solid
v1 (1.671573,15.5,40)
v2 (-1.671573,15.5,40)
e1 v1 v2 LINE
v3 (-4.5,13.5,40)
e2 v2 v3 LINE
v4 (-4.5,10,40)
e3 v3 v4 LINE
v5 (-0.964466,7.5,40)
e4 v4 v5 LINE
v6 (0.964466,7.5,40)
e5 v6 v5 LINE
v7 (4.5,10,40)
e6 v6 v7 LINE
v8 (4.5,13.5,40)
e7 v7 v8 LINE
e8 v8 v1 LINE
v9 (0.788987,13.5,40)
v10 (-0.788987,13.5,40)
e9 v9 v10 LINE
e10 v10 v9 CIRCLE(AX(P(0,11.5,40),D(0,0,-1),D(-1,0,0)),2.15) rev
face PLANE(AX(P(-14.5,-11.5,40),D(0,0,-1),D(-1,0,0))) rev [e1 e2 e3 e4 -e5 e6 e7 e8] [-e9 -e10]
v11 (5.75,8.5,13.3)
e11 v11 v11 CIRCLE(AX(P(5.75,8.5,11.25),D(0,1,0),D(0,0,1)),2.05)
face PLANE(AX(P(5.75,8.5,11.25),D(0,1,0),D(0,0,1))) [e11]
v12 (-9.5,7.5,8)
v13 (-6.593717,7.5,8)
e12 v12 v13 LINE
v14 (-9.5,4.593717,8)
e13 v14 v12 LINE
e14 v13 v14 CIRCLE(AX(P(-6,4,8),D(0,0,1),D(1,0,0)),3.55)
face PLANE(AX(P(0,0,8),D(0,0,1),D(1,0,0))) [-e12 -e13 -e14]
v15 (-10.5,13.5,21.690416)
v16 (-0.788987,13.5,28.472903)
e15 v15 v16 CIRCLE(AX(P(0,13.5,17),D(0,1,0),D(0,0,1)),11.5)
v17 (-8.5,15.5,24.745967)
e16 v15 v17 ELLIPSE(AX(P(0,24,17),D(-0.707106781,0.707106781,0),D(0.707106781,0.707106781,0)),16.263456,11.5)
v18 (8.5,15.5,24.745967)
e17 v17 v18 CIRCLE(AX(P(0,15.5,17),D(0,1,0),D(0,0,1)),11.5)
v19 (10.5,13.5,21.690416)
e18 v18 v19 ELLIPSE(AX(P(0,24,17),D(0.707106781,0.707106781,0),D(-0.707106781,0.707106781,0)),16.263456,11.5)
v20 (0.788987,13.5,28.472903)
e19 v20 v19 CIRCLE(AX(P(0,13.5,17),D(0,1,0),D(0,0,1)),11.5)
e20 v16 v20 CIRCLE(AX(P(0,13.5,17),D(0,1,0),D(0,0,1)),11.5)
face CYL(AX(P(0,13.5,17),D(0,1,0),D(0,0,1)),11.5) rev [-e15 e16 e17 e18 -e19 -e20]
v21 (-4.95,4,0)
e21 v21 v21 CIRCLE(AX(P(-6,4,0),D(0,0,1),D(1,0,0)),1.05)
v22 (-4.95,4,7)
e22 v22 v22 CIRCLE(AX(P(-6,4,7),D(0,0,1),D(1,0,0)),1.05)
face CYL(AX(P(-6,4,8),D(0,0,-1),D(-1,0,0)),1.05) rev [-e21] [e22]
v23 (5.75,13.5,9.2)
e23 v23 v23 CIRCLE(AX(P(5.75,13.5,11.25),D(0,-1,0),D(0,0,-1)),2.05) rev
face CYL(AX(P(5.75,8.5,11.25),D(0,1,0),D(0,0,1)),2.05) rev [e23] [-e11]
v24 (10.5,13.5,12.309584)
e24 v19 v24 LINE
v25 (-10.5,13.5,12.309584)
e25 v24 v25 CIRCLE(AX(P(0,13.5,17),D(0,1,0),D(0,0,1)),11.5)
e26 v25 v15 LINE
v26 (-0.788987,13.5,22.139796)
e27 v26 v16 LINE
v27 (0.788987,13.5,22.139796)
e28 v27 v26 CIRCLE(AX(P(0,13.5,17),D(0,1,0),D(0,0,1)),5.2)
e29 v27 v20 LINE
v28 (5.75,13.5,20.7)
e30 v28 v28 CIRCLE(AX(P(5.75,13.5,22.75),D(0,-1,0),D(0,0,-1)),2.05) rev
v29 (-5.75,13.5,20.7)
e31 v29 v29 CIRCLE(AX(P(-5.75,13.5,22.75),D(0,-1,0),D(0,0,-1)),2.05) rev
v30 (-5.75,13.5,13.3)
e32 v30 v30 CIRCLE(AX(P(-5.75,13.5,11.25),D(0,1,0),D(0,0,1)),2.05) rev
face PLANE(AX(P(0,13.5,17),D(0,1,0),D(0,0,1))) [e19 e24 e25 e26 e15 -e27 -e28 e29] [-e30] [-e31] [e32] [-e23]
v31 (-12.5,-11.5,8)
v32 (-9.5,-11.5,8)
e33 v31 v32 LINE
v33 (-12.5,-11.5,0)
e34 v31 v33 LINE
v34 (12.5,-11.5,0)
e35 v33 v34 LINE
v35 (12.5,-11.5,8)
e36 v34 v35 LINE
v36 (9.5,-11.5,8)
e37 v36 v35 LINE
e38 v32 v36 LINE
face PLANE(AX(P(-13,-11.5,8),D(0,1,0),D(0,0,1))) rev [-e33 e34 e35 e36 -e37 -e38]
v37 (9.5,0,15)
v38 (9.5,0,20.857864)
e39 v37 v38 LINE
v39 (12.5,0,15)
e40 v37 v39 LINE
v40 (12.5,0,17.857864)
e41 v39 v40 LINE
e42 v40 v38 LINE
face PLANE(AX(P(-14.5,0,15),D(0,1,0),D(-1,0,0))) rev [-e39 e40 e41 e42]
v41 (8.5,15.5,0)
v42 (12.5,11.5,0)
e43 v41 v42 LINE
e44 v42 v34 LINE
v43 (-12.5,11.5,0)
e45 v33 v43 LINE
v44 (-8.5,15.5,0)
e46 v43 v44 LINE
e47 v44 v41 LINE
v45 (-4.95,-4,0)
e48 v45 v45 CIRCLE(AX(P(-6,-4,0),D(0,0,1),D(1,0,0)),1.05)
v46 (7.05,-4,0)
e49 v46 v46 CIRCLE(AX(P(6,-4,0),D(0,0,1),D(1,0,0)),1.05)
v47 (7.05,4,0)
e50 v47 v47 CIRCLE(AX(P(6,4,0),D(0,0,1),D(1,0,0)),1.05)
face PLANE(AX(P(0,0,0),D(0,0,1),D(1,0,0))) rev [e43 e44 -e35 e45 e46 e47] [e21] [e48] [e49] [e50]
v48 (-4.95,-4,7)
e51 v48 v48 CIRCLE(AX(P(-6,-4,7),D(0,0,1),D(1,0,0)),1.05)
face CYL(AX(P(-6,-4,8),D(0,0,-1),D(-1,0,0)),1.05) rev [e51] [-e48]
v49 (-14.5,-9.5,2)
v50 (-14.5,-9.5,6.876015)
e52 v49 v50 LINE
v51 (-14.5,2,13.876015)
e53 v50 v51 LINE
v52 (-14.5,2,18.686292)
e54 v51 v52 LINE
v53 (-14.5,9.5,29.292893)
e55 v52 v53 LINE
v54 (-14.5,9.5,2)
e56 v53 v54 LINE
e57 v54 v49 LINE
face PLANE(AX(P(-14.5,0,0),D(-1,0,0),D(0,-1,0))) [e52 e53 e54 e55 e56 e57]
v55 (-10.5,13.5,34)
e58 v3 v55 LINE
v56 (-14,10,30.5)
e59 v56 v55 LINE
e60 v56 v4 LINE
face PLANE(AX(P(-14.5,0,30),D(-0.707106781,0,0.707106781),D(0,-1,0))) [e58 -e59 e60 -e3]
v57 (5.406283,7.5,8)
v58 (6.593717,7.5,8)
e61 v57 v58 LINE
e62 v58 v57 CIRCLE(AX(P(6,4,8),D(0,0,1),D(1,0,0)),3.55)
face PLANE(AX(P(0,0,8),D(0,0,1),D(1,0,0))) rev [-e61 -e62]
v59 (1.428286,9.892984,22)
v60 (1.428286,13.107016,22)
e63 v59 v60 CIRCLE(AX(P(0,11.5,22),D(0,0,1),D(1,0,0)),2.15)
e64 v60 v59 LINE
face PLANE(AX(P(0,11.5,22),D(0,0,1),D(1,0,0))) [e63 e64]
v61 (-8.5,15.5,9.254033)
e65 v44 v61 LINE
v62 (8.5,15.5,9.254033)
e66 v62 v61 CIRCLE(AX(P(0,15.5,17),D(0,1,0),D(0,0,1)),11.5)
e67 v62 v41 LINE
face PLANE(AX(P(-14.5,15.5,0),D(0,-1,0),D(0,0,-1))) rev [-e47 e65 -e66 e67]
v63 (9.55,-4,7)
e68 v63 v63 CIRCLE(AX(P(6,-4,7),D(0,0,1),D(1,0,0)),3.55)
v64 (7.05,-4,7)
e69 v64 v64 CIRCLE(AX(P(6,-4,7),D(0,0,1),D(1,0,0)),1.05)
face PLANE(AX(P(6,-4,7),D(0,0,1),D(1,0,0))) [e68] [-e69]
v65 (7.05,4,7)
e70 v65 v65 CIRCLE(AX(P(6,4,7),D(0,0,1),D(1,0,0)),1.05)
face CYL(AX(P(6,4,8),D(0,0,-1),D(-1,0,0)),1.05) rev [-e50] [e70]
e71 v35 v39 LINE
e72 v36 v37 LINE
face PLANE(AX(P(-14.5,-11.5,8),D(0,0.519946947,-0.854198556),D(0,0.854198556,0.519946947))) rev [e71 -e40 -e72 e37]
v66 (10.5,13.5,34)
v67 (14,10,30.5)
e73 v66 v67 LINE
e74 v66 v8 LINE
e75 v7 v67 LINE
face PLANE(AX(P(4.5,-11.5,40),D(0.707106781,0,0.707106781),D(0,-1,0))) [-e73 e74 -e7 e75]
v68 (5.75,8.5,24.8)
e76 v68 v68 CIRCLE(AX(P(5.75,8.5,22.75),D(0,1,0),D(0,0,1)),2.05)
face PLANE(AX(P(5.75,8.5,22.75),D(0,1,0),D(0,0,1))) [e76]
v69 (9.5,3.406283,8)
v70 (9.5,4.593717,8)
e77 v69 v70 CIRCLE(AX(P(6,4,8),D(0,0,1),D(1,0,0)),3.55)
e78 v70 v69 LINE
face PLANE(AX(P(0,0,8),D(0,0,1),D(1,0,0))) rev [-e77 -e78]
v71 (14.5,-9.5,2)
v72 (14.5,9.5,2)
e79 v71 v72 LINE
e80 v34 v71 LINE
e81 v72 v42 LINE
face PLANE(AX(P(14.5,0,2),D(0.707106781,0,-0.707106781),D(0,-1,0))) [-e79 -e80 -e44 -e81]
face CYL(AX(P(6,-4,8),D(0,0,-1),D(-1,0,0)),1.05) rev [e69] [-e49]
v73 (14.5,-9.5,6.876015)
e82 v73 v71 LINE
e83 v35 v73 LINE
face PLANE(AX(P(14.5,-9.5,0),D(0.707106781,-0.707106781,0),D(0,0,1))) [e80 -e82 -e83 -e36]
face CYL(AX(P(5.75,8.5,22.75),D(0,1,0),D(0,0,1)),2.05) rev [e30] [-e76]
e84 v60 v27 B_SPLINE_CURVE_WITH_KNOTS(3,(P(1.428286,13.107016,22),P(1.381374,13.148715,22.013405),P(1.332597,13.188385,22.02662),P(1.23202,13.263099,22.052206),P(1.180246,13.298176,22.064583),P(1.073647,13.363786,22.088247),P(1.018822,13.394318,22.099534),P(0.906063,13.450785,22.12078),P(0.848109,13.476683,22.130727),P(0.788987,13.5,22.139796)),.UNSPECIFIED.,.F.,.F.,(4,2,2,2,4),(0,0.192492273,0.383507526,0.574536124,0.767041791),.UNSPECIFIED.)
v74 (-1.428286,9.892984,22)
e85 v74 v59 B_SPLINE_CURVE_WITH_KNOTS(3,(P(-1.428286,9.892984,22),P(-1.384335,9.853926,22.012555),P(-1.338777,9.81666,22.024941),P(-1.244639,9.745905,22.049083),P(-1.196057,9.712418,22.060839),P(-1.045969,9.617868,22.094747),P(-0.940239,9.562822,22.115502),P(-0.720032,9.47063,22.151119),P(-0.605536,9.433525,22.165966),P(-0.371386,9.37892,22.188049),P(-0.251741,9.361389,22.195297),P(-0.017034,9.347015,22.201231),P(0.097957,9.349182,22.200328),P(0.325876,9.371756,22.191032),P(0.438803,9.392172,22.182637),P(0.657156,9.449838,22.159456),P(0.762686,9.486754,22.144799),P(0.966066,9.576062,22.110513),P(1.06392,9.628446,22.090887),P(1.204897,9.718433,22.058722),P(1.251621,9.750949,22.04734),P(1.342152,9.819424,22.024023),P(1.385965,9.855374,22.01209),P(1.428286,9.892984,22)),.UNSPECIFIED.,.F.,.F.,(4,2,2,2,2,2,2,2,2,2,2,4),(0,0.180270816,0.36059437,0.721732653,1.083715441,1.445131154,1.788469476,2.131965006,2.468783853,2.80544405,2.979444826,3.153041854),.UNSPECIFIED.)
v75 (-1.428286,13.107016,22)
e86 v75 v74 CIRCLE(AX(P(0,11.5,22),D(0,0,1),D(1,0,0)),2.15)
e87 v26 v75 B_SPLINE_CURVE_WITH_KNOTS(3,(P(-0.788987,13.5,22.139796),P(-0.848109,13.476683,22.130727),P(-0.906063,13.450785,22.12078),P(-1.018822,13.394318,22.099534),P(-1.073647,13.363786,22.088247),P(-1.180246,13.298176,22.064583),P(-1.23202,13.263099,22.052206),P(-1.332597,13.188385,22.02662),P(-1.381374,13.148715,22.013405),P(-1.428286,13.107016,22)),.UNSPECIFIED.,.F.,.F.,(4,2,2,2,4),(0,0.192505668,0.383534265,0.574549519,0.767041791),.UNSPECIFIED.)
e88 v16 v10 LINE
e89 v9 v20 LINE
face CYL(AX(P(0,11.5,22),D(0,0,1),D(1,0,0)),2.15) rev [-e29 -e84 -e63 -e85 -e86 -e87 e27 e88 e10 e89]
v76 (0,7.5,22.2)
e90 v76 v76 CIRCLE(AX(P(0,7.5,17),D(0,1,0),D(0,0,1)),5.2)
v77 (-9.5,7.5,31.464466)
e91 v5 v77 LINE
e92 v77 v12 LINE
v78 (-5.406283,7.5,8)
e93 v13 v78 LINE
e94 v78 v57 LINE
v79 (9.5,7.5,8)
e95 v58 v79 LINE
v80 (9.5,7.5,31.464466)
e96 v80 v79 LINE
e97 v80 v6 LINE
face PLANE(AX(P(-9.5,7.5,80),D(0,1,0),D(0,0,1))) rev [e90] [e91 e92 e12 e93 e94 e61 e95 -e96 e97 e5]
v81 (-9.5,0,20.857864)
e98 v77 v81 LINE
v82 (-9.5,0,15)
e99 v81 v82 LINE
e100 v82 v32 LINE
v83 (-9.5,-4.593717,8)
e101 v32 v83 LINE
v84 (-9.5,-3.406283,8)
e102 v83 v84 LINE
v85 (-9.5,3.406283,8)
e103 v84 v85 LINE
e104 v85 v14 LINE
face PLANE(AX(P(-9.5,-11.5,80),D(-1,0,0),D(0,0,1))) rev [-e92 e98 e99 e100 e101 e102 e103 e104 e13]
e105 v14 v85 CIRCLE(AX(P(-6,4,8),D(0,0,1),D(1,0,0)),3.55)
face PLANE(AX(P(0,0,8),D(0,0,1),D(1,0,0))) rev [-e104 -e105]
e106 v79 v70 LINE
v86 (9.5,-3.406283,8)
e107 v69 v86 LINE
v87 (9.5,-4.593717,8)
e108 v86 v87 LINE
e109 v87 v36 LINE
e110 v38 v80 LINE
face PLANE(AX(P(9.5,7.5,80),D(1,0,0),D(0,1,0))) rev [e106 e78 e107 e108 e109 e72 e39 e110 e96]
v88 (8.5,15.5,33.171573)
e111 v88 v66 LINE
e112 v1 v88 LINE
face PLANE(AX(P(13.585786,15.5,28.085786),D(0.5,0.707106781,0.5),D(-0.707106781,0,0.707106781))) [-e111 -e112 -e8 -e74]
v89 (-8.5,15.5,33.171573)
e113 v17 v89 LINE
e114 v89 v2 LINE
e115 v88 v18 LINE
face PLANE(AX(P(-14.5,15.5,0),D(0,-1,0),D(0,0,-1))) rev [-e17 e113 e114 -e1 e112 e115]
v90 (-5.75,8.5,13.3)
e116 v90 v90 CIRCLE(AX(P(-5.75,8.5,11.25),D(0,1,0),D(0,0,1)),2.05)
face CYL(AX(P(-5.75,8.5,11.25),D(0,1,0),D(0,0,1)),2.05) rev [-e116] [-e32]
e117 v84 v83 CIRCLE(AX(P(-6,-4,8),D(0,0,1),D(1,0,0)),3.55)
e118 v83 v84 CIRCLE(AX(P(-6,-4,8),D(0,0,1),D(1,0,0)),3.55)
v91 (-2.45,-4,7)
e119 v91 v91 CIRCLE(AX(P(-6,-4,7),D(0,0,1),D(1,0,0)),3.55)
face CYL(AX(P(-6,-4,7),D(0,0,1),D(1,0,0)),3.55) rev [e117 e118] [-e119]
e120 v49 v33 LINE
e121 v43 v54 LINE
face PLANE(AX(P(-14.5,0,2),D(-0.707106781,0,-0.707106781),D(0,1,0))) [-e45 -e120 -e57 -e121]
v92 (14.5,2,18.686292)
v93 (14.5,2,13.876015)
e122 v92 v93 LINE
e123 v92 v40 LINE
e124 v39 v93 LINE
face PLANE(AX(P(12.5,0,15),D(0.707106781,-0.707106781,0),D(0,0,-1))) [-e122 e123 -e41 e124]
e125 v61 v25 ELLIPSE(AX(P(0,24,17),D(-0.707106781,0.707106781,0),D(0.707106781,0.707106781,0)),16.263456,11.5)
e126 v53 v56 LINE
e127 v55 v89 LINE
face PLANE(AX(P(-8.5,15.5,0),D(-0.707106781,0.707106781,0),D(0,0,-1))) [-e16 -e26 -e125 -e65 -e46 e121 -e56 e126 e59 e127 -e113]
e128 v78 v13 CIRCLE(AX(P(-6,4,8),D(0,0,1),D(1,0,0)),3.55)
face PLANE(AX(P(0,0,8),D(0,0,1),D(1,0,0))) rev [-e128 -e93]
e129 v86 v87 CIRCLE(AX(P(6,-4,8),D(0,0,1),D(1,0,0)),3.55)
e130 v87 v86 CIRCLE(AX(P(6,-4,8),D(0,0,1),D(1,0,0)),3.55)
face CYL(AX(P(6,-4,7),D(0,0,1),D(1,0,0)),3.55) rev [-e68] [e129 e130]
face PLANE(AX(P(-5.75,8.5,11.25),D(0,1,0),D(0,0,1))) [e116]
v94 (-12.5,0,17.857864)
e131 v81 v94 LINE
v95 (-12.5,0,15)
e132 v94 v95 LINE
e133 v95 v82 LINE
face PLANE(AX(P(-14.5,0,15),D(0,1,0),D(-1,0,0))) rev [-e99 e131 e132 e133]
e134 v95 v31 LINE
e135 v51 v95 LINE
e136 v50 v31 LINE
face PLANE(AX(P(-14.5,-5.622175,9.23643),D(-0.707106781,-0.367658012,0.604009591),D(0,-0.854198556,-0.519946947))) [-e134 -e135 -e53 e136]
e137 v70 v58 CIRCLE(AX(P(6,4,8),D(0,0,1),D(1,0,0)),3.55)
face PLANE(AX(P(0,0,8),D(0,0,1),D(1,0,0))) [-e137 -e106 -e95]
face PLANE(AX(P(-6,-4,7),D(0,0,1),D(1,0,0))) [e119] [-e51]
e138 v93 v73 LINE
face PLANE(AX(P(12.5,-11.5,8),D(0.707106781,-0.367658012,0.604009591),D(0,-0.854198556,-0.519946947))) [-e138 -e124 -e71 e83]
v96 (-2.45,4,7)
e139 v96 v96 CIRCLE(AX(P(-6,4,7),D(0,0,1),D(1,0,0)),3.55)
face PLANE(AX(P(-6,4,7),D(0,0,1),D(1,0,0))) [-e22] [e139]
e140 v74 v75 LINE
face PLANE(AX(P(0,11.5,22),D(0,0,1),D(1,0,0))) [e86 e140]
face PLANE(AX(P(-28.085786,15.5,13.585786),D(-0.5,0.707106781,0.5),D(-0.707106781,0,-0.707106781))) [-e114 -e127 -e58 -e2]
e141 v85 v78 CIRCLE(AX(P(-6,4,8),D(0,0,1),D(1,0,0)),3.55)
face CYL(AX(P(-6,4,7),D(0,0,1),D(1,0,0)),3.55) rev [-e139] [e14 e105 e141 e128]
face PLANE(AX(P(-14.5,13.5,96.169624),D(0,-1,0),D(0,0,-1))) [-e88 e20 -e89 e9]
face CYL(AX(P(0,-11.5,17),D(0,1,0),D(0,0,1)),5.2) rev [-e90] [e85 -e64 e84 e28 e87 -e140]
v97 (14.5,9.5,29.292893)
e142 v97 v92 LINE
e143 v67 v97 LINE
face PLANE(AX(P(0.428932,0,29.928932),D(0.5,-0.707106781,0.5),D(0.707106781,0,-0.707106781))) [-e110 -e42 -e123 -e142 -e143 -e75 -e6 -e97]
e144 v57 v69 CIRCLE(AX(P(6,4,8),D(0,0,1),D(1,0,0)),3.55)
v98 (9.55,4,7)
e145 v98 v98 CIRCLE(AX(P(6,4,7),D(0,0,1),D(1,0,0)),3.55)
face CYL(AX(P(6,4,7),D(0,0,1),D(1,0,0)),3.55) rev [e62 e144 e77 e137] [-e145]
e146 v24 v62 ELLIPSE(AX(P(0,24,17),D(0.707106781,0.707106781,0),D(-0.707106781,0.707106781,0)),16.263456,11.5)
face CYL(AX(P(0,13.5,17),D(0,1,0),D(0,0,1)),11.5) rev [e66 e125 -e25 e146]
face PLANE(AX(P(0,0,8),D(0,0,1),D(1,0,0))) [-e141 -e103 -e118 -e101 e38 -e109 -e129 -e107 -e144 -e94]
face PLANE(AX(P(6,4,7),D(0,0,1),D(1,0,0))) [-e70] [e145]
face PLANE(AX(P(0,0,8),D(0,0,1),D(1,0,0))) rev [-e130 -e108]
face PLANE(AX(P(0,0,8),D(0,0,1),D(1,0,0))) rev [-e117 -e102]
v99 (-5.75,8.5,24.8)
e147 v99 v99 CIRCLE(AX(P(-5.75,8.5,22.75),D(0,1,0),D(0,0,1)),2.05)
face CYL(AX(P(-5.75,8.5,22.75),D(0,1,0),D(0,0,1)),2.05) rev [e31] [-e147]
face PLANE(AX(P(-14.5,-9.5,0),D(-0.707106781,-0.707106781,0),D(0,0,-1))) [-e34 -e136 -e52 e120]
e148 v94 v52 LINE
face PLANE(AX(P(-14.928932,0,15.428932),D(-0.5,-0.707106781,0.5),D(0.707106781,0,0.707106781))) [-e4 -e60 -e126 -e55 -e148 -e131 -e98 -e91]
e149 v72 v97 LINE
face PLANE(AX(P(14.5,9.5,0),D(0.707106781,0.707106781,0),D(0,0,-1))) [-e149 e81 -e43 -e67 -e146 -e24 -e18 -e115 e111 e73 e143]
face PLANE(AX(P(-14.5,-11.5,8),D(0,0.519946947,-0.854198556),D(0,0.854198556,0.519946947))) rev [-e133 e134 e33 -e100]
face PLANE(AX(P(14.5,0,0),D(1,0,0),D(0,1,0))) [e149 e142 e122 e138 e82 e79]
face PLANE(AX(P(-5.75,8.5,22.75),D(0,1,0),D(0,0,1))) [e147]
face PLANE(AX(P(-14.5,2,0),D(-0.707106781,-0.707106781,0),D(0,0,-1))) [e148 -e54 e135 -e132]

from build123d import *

# Parameters (mm, degrees)
SKETCH1_W           = 26
SKETCH1_H           = 23
SKETCH1_R           = 1.05
BOSS_EXTRUDE1_DEPTH = 8
SKETCH2_R           = 3.55
CUT_EXTRUDE1_DEPTH  = 1
BOSS_EXTRUDE2_DEPTH = 72
SKETCH4_W           = 80
SKETCH4_H           = 23
BOSS_EXTRUDE3_DEPTH = 1.5
SKETCH5_W           = 80
SKETCH5_H           = 23
BOSS_EXTRUDE4_DEPTH = 1.5
SKETCH6_W           = 29
SKETCH6_H           = 80
BOSS_EXTRUDE5_DEPTH = 2
CUT_EXTRUDE2_DEPTH  = 87.15828457
SKETCH8_W           = 30
SKETCH8_H           = 4
BOSS_EXTRUDE6_DEPTH = 29
CUT_EXTRUDE3_DEPTH  = 87.32062326
SKETCH10_W          = 15.789473684
SKETCH10_H          = 7.5
CUT_EXTRUDE4_DEPTH  = 87.874910072
CHAMFER1_SIZE2      = 7.5
CHAMFER1_SIZE       = 15
CHAMFER2_SIZE2      = 7.5
CHAMFER2_SIZE       = 15
CHAMFER3_SIZE       = 4
CHAMFER3_SIZE_2     = 10
SKETCH12_R          = 5.2
CUT_EXTRUDE5_DEPTH  = 86.060272748
SKETCH14_R          = 2.05
CUT_EXTRUDE6_DEPTH  = 5
SKETCH15_R          = 2.15
CUT_EXTRUDE8_DEPTH  = 58
SKETCH21_W          = 29
SKETCH21_H          = 2
CUT_EXTRUDE9_DEPTH  = 84.165497654
BOSS_EXTRUDE7_REACH = 84.768
SKETCH22_W          = 29
SKETCH22_H          = 2
SKETCH23_R          = 2.05
CUT_EXTRUDE10_DEPTH = 86.060272842
SKETCH24_R          = 11.5
CUT_EXTRUDE11_DEPTH = 2
CHAMFER6_SIZE       = 2
SKETCH25_W          = 32.290381518
SKETCH25_H          = 43.882216094
CUT_EXTRUDE12_DEPTH = 86.669422877
CHAMFER7_SIZE       = 10
CHAMFER8_SIZE       = 10
CHAMFER9_SIZE       = 2


# Some blends are built 0.0001 mm under size
with BuildPart() as part:
    # Sketch1 → Boss-Extrude1 (new body)
    with BuildSketch(Plane.XY):
        Rectangle(SKETCH1_W, SKETCH1_H)
        with Locations((-6, 4)):
            Circle(SKETCH1_R, mode=Mode.SUBTRACT)
        with Locations((6, 4)):
            Circle(SKETCH1_R, mode=Mode.SUBTRACT)
        with Locations((-6, -4)):
            Circle(SKETCH1_R, mode=Mode.SUBTRACT)
        with Locations((6, -4)):
            Circle(SKETCH1_R, mode=Mode.SUBTRACT)
    extrude(amount=BOSS_EXTRUDE1_DEPTH)

    # Sketch2 → Cut-Extrude1 (cut)
    with BuildSketch(Plane.XY.offset(8)):
        with Locations((-6, 4)):
            Circle(SKETCH2_R)
        with Locations((6, 4)):
            Circle(SKETCH2_R)
        with Locations((6, -4)):
            Circle(SKETCH2_R)
        with Locations((-6, -4)):
            Circle(SKETCH2_R)
    extrude(amount=-CUT_EXTRUDE1_DEPTH, mode=Mode.SUBTRACT)

    # Sketch3 → Boss-Extrude2 (add)
    with BuildSketch(Plane.XY.offset(8)):
        Polygon((-13, 11.5), (13, 11.5), (13, 7.5), (13, -11.5), (9.5, -11.5), (9.5, 7.5), (-9.5, 7.5), (-9.5, -11.5), (-13, -11.5), (-13, 7.5), align=None)
    extrude(amount=BOSS_EXTRUDE2_DEPTH)

    # Sketch4 → Boss-Extrude3 (add)
    with BuildSketch(Plane.ZY.offset(13)):
        with Locations((40, 0)):
            Rectangle(SKETCH4_W, SKETCH4_H)
    extrude(amount=BOSS_EXTRUDE3_DEPTH)

    # Sketch5 → Boss-Extrude4 (add)
    with BuildSketch(Plane(origin=(13, 0, 0), x_dir=(0, 0, -1), z_dir=(1, 0, 0))):
        with Locations((-40, 0)):
            Rectangle(SKETCH5_W, SKETCH5_H)
    extrude(amount=BOSS_EXTRUDE4_DEPTH)

    # Sketch6 → Boss-Extrude5 (add)
    with BuildSketch(Plane(origin=(0, 11.5, 0), x_dir=(1, 0, 0), z_dir=(0, 1, 0))):
        with Locations((0, -40)):
            Rectangle(SKETCH6_W, SKETCH6_H)
    extrude(amount=BOSS_EXTRUDE5_DEPTH)

    # Sketch7 → Cut-Extrude2 (cut, through all)
    with BuildSketch(Plane(origin=(14.5, 0, 0), x_dir=(0, 0, -1), z_dir=(1, 0, 0))):
        Polygon((-8, -11.5), (-15, 0), (-52, 0), (-80, 7.5), (-80, -11.5), align=None)
    extrude(amount=-CUT_EXTRUDE2_DEPTH, mode=Mode.SUBTRACT)

    # Sketch8 → Boss-Extrude6 (add)
    with BuildSketch(Plane.ZY.offset(14.5)):
        with Locations((65, 15.5)):
            Rectangle(SKETCH8_W, SKETCH8_H)
    extrude(amount=-BOSS_EXTRUDE6_DEPTH)

    # Sketch9 → Cut-Extrude3 (cut, through all)
    with BuildSketch(Plane(origin=(0, 17.5, 0), x_dir=(1, 0, 0), z_dir=(0, 1, 0))):
        Polygon((-5, -80), (-14.5, -50), (-14.5, -80), align=None)
        Polygon((14.5, -50), (14.5, -80), (5, -80), align=None)
    extrude(amount=-CUT_EXTRUDE3_DEPTH, mode=Mode.SUBTRACT)

    # Sketch10 → Cut-Extrude4 (cut, through all)
    with BuildSketch(Plane(origin=(14.5, 0, 0), x_dir=(0, 0, -1), z_dir=(1, 0, 0))):
        with Locations((-57.894736842, 3.75)):
            Rectangle(SKETCH10_W, SKETCH10_H)
    extrude(amount=-CUT_EXTRUDE4_DEPTH, mode=Mode.SUBTRACT)

    # Chamfer1
    chamfer1_edges = [part.edges().sort_by_distance(p)[0] for p in [
        (12, 7.5, 50),
    ]]
    chamfer1_side = [part.faces().sort_by_distance(p)[0] for p in [
        (12, 7.5, 50.15),
    ]]
    chamfer(chamfer1_edges, length=CHAMFER1_SIZE - 0.0001, length2=CHAMFER1_SIZE2 - 0.0001, reference=chamfer1_side[0])  # a hair under: the kernel refuses the full size

    # Chamfer2
    chamfer2_edges = [part.edges().sort_by_distance(p)[0] for p in [
        (-12, 7.5, 50),
    ]]
    chamfer2_side = [part.faces().sort_by_distance(p)[0] for p in [
        (-12, 7.5, 50.15),
    ]]
    chamfer(chamfer2_edges, length=CHAMFER2_SIZE - 0.0001, length2=CHAMFER2_SIZE2 - 0.0001, reference=chamfer2_side[0])  # a hair under: the kernel refuses the full size

    # Chamfer3
    # the kernel refuses this chamfer: 10, 4 mm, written as the material it adds along each edge
    with BuildSketch(Plane(origin=(-14.5, 13.5, 50), x_dir=(0, 0.996016754004022, 0.08916628142572501), z_dir=(1, 0, 0))) as chamfer3_piece_1_section:
        Polygon((CHAMFER3_SIZE * 0.996016754004, -CHAMFER3_SIZE * 0.0891662814257), (-CHAMFER3_SIZE_2 * 0.0891662814257, -CHAMFER3_SIZE_2 * 0.996016754004), (0, 0), align=None)
    chamfer3_piece_1 = extrude(amount=29, mode=Mode.PRIVATE)
    chamfer3_piece_1 = split(chamfer3_piece_1, bisect_by=Plane(origin=(0, 17.5, 46.584895752), z_dir=(0, -1, 0)), keep=Keep.TOP, mode=Mode.PRIVATE)
    chamfer3_piece_1 = split(chamfer3_piece_1, bisect_by=Plane(origin=(-14.161378148, 14.736098837, 51.069332166), z_dir=(0.9533422253507436, 0, -0.3018917046944019)), keep=Keep.TOP, mode=Mode.PRIVATE)
    chamfer3_piece_1 = split(chamfer3_piece_1, bisect_by=Plane(origin=(14.161378148, 14.736098837, 51.069332166), z_dir=(-0.9533422253507436, 0, -0.30189170469440213)), keep=Keep.TOP, mode=Mode.PRIVATE)
    add(chamfer3_piece_1)

    # Sketch12 → Cut-Extrude5 (cut, through all)
    with BuildSketch(Plane(origin=(0, 13.5, 0), x_dir=(1, 0, 0), z_dir=(0, 1, 0))):
        with Locations(Location((0, -17, 0), (0, 0, 270))):
            Circle(SKETCH12_R)
    extrude(amount=-CUT_EXTRUDE5_DEPTH, mode=Mode.SUBTRACT)

    # Sketch14 → Cut-Extrude6 (cut)
    with BuildSketch(Plane(origin=(0, 13.5, 0), x_dir=(1, 0, 0), z_dir=(0, 1, 0))):
        with Locations(Location((5.75, -11.25, 0), (0, 0, 270))):
            Circle(SKETCH14_R)
        with Locations(Location((5.75, -22.75, 0), (0, 0, 270))):
            Circle(SKETCH14_R)
        with Locations(Location((-5.75, -22.75, 0), (0, 0, 270))):
            Circle(SKETCH14_R)
        with Locations(Location((-5.75, -11.25, 0), (0, 0, 270))):
            Circle(SKETCH14_R)
    extrude(amount=-CUT_EXTRUDE6_DEPTH, mode=Mode.SUBTRACT)

    # Sketch15 → Cut-Extrude8 (cut)
    with BuildSketch(Plane.XY.offset(80)):
        with Locations((0, 11.5)):
            Circle(SKETCH15_R)
    extrude(amount=-CUT_EXTRUDE8_DEPTH, mode=Mode.SUBTRACT)

    # Sketch21 → Cut-Extrude9 (cut, through all)
    with BuildSketch(Plane.XY.offset(80)):
        with Locations((0, 16.5)):
            Rectangle(SKETCH21_W, SKETCH21_H)
    extrude(amount=-CUT_EXTRUDE9_DEPTH, mode=Mode.SUBTRACT)

    # Boss-Extrude7: up to this plane
    boss_extrude7_end = Plane(origin=(44.765491901, 17.5, 50), z_dir=(0, 0.9284766908852583, -0.3713906763541064))
    # Sketch22 → Boss-Extrude7 (add, up to the surface)
    with BuildSketch(Plane(origin=(0, 0, 0), x_dir=(-1, 0, 0), z_dir=(0, 0, -1)), mode=Mode.PRIVATE) as boss_extrude7_sk1:
        with Locations((0, 14.5)):
            Rectangle(SKETCH22_W, SKETCH22_H)
    boss_extrude7_tool1 = split(extrude(boss_extrude7_sk1.sketch, amount=-BOSS_EXTRUDE7_REACH, mode=Mode.PRIVATE), bisect_by=boss_extrude7_end, keep=Keep.BOTH, mode=Mode.PRIVATE)
    add(boss_extrude7_tool1.solids().sort_by_distance((0, 14.5, 0))[0])

    # Sketch23 → Cut-Extrude10 (cut, through all)
    with BuildSketch(Plane(origin=(0, 13.5, 0), x_dir=(-1, 0, 0), z_dir=(0, -1, 0))):
        with Locations(Location((5.75, -11.25, 0), (0, 0, 270))):
            Circle(SKETCH23_R)
    extrude(amount=-CUT_EXTRUDE10_DEPTH, mode=Mode.SUBTRACT)

    # Sketch24 → Cut-Extrude11 (cut)
    with BuildSketch(Plane(origin=(0, 15.5, 0), x_dir=(1, 0, 0), z_dir=(0, 1, 0))):
        with Locations(Location((0, -17, 0), (0, 0, 270))):
            Circle(SKETCH24_R)
    extrude(amount=-CUT_EXTRUDE11_DEPTH, mode=Mode.SUBTRACT)

    # Chamfer4
    # the kernel refuses this chamfer: 6 mm, written as the material it takes off along each edge
    with BuildSketch(Plane(origin=(-14.5, 15.5, 87.032235027), x_dir=(-0.0274958766105865, -0.9996219169112968, 0), z_dir=(0, 0, -1)), Plane(origin=(14.5, 15.5, 87.032235027), x_dir=(-0.9996219169112969, 0.02749587661058649, 0), z_dir=(0, 0, -1))) as chamfer4_piece_1:
        with BuildLine():
            Line((6.172039171, 0), (-0.339282929, -6.162706761))
            Line((-0.339282929, -6.162706761), (-0.459237559, -6.159407256))
            ThreePointArc((-0.459237559, -6.159407256), (-0.204775362, -3.080386978), (-0.11995463, 0.003299505))
            Line((-0.11995463, 0.003299505), (0.003299505, 0.11995463))
            ThreePointArc((0.003299505, 0.11995463), (3.086985988, 0.035133898), (6.175338676, 0.11995463))
            Line((6.175338676, 0.11995463), (6.172039171, 0))
        make_face()
    extrude(amount=124.064470053, mode=Mode.SUBTRACT)

    # Chamfer5
    # the kernel refuses this chamfer: 2.336899136, 2 mm, written as the material it takes off along each edge
    with BuildSketch(Plane(origin=(-8.106777279, 10.094594893, 70.189124382), x_dir=(0.961659390492848, -0.1504091467073527, -0.22932140166955664), z_dir=(-0.2725155737769916, -0.43028487946482336, -0.8605754961378691))) as chamfer5_piece_1_section:
        with BuildLine():
            Line((2.067154496, 0), (-0.457557549, -2.368181214))
            Line((-0.457557549, -2.368181214), (-0.503642169, -2.360393606))
            ThreePointArc((-0.503642169, -2.360393606), (-0.246974517, -1.1810158), (-0.04608462, 0.007787608))
            Line((-0.04608462, 0.007787608), (0.001494452, 0.046714084))
            ThreePointArc((0.001494452, 0.046714084), (1.034014963, 0.013682238), (2.068648949, 0.046714084))
            Line((2.068648949, 0.046714084), (2.067154496, 0))
        make_face()
    chamfer5_piece_1 = extrude(amount=29.489973718, mode=Mode.PRIVATE)
    chamfer5_piece_1 = split(chamfer5_piece_1, bisect_by=Plane(origin=(-11.667443521, 7.5, 56.707905071), z_dir=(0, -1, 0)), keep=Keep.TOP, mode=Mode.PRIVATE)
    add(chamfer5_piece_1, mode=Mode.SUBTRACT)
    with BuildSketch(Plane(origin=(8.106777279, 10.094594893, 70.189124382), x_dir=(-0.961659390492848, -0.1504091467073528, -0.22932140166955695), z_dir=(0.27251557377699187, -0.4302848794648234, -0.860575496137869))) as chamfer5_piece_2_section:
        with BuildLine():
            Line((2.067154496, 0), (-0.457557549, 2.368181214))
            Line((-0.457557549, 2.368181214), (-0.503642169, 2.360393606))
            ThreePointArc((-0.503642169, 2.360393606), (-0.246974517, 1.1810158), (-0.04608462, -0.007787608))
            Line((-0.04608462, -0.007787608), (0.001494452, -0.046714084))
            ThreePointArc((0.001494452, -0.046714084), (1.034014963, -0.013682238), (2.068648949, -0.046714084))
            Line((2.068648949, -0.046714084), (2.067154496, 0))
        make_face()
    chamfer5_piece_2 = extrude(amount=29.489973718, mode=Mode.PRIVATE)
    chamfer5_piece_2 = split(chamfer5_piece_2, bisect_by=Plane(origin=(11.667443521, 7.5, 56.707905071), z_dir=(0, -1, 0)), keep=Keep.TOP, mode=Mode.PRIVATE)
    add(chamfer5_piece_2, mode=Mode.SUBTRACT)
    with BuildSketch(Plane(origin=(14.5, 0, 9.856634024), x_dir=(0.02749587661058647, 0.9996219169112968, 0), z_dir=(0, 0, 1))) as chamfer5_piece_3_section:
        with BuildLine():
            Line((2.05734639, 0), (-0.11309431, 2.054235587))
            Line((-0.11309431, 2.054235587), (-0.153079186, 2.053135752))
            ThreePointArc((-0.153079186, 2.053135752), (-0.068258454, 1.026795659), (-0.039984877, -0.001099835))
            Line((-0.039984877, -0.001099835), (0.001099835, -0.039984877))
            ThreePointArc((0.001099835, -0.039984877), (1.028995329, -0.011711299), (2.058446225, -0.039984877))
            Line((2.058446225, -0.039984877), (2.05734639, 0))
        make_face()
    chamfer5_piece_3 = extrude(amount=45.286731952, mode=Mode.PRIVATE)
    chamfer5_piece_3 = split(chamfer5_piece_3, bisect_by=Plane(origin=(13.83833288, 9.481660415, 20.77144547), z_dir=(0, -0.5199469468957453, 0.8541985556144386)), keep=Keep.TOP, mode=Mode.PRIVATE)
    add(chamfer5_piece_3, mode=Mode.SUBTRACT)
    with BuildSketch(Plane(origin=(-14.5, 4.393455788, 17.674277436), x_dir=(-0.027495876610586452, 0.519750363748101, -0.8538755975861659), z_dir=(0, -0.8541985556144386, -0.5199469468957453))) as chamfer5_piece_4_section:
        with BuildLine():
            Line((2.05734639, 0), (-0.11309431, 2.054235587))
            Line((-0.11309431, 2.054235587), (-0.153079186, 2.053135752))
            ThreePointArc((-0.153079186, 2.053135752), (-0.068258454, 1.026795659), (-0.039984877, -0.001099835))
            Line((-0.039984877, -0.001099835), (0.001099835, -0.039984877))
            ThreePointArc((0.001099835, -0.039984877), (1.028995329, -0.011711299), (2.058446225, -0.039984877))
            Line((2.058446225, -0.039984877), (2.05734639, 0))
        make_face()
    chamfer5_piece_4 = extrude(amount=23.74964397, mode=Mode.PRIVATE)
    chamfer5_piece_4 = split(chamfer5_piece_4, bisect_by=Plane(origin=(-13.835872305, 0, 9.503665371), z_dir=(0, -1, 0)), keep=Keep.TOP, mode=Mode.PRIVATE)
    add(chamfer5_piece_4, mode=Mode.SUBTRACT)
    with BuildSketch(Plane(origin=(14.5, -15.893455788, 5.325722564), x_dir=(0.027495876610586504, 0.5197503637481011, -0.8538755975861659), z_dir=(0, 0.8541985556144386, 0.5199469468957453))) as chamfer5_piece_5_section:
        with BuildLine():
            Line((2.05734639, 0), (-0.11309431, 2.054235587))
            Line((-0.11309431, 2.054235587), (-0.153079186, 2.053135752))
            ThreePointArc((-0.153079186, 2.053135752), (-0.068258454, 1.026795659), (-0.039984877, -0.001099835))
            Line((-0.039984877, -0.001099835), (0.001099835, -0.039984877))
            ThreePointArc((0.001099835, -0.039984877), (1.028995329, -0.011711299), (2.058446225, -0.039984877))
            Line((2.058446225, -0.039984877), (2.05734639, 0))
        make_face()
    chamfer5_piece_5 = extrude(amount=23.74964397, mode=Mode.PRIVATE)
    chamfer5_piece_5 = split(chamfer5_piece_5, bisect_by=Plane(origin=(13.835872305, 0, 9.503665371), z_dir=(0, -1, 0)), keep=Keep.TOP, mode=Mode.PRIVATE)
    add(chamfer5_piece_5, mode=Mode.SUBTRACT)
    with BuildSketch(Plane(origin=(14.5, -11.5, 13.143365976), x_dir=(0.027495876610586438, 0.9996219169112968, 0), z_dir=(0, 0, -1)), Plane(origin=(-14.5, -11.5, -5.143365976), x_dir=(-0.027495876610586487, 0.9996219169112968, 0), z_dir=(0, 0, 1))) as chamfer5_piece_6:
        with BuildLine():
            Line((2.05734639, 0), (-0.11309431, -2.054235587))
            Line((-0.11309431, -2.054235587), (-0.153079186, -2.053135752))
            ThreePointArc((-0.153079186, -2.053135752), (-0.068258454, -1.026795659), (-0.039984877, 0.001099835))
            Line((-0.039984877, 0.001099835), (0.001099835, 0.039984877))
            ThreePointArc((0.001099835, 0.039984877), (1.028995329, 0.011711299), (2.058446225, 0.039984877))
            Line((2.058446225, 0.039984877), (2.05734639, 0))
        make_face()
    extrude(amount=18.286731952, mode=Mode.SUBTRACT)
    with BuildSketch(Plane(origin=(-14.5, 0, 55.143365976), x_dir=(-0.027495876610586494, 0.9996219169112968, 0), z_dir=(0, 0, -1))) as chamfer5_piece_7_section:
        with BuildLine():
            Line((2.05734639, 0), (-0.11309431, 2.054235587))
            Line((-0.11309431, 2.054235587), (-0.153079186, 2.053135752))
            ThreePointArc((-0.153079186, 2.053135752), (-0.068258454, 1.026795659), (-0.039984877, -0.001099835))
            Line((-0.039984877, -0.001099835), (0.001099835, -0.039984877))
            ThreePointArc((0.001099835, -0.039984877), (1.028995329, -0.011711299), (2.058446225, -0.039984877))
            Line((2.058446225, -0.039984877), (2.05734639, 0))
        make_face()
    chamfer5_piece_7 = extrude(amount=45.286731952, mode=Mode.PRIVATE)
    chamfer5_piece_7 = split(chamfer5_piece_7, bisect_by=Plane(origin=(-13.83833288, 9.481660415, 20.77144547), z_dir=(0, -0.5199469468957453, 0.8541985556144386)), keep=Keep.TOP, mode=Mode.PRIVATE)
    add(chamfer5_piece_7, mode=Mode.SUBTRACT)
    with BuildSketch(Plane(origin=(14.5, 0, 9.856634024), x_dir=(0.02749587661058647, 0.9996219169112968, 0), z_dir=(0, 0, 1))) as chamfer5_piece_8a_section:
        with BuildLine():
            Line((2.05734639, 0), (-0.11309431, 2.054235587))
            Line((-0.11309431, 2.054235587), (-0.153079186, 2.053135752))
            ThreePointArc((-0.153079186, 2.053135752), (-0.068258454, 1.026795659), (-0.039984877, -0.001099835))
            Line((-0.039984877, -0.001099835), (0.001099835, -0.039984877))
            ThreePointArc((0.001099835, -0.039984877), (1.028995329, -0.011711299), (2.058446225, -0.039984877))
            Line((2.058446225, -0.039984877), (2.05734639, 0))
        make_face()
    chamfer5_piece_8a = extrude(amount=45.286731952, mode=Mode.PRIVATE)
    chamfer5_piece_8a = split(chamfer5_piece_8a, bisect_by=Plane(origin=(13.855319863, -0.547637516, 14.666655425), z_dir=(0, 0.5199469468957453, -0.8541985556144386)), keep=Keep.TOP, mode=Mode.PRIVATE)
    with BuildSketch(Plane(origin=(14.5, -15.893455788, 5.325722564), x_dir=(0.027495876610586504, 0.5197503637481011, -0.8538755975861659), z_dir=(0, 0.8541985556144386, 0.5199469468957453))) as chamfer5_piece_8b_section:
        with BuildLine():
            Line((2.05734639, 0), (-0.11309431, 2.054235587))
            Line((-0.11309431, 2.054235587), (-0.153079186, 2.053135752))
            ThreePointArc((-0.153079186, 2.053135752), (-0.068258454, 1.026795659), (-0.039984877, -0.001099835))
            Line((-0.039984877, -0.001099835), (0.001099835, -0.039984877))
            ThreePointArc((0.001099835, -0.039984877), (1.028995329, -0.011711299), (2.058446225, -0.039984877))
            Line((2.058446225, -0.039984877), (2.05734639, 0))
        make_face()
    chamfer5_piece_8b = extrude(amount=23.74964397, mode=Mode.PRIVATE)
    chamfer5_piece_8b = split(chamfer5_piece_8b, bisect_by=Plane(origin=(13.855319863, 0, 15.64111267), z_dir=(0, 1, 0)), keep=Keep.TOP, mode=Mode.PRIVATE)
    chamfer5_piece_8 = chamfer5_piece_8a & chamfer5_piece_8b
    add(chamfer5_piece_8, mode=Mode.SUBTRACT)
    with BuildSketch(Plane(origin=(-14.5, 0, 55.143365976), x_dir=(-0.027495876610586494, 0.9996219169112968, 0), z_dir=(0, 0, -1))) as chamfer5_piece_9a_section:
        with BuildLine():
            Line((2.05734639, 0), (-0.11309431, 2.054235587))
            Line((-0.11309431, 2.054235587), (-0.153079186, 2.053135752))
            ThreePointArc((-0.153079186, 2.053135752), (-0.068258454, 1.026795659), (-0.039984877, -0.001099835))
            Line((-0.039984877, -0.001099835), (0.001099835, -0.039984877))
            ThreePointArc((0.001099835, -0.039984877), (1.028995329, -0.011711299), (2.058446225, -0.039984877))
            Line((2.058446225, -0.039984877), (2.05734639, 0))
        make_face()
    chamfer5_piece_9a = extrude(amount=45.286731952, mode=Mode.PRIVATE)
    chamfer5_piece_9a = split(chamfer5_piece_9a, bisect_by=Plane(origin=(-13.855319863, -0.547637516, 14.666655425), z_dir=(0, 0.5199469468957453, -0.8541985556144386)), keep=Keep.TOP, mode=Mode.PRIVATE)
    with BuildSketch(Plane(origin=(-14.5, 4.393455788, 17.674277436), x_dir=(-0.027495876610586452, 0.519750363748101, -0.8538755975861659), z_dir=(0, -0.8541985556144386, -0.5199469468957453))) as chamfer5_piece_9b_section:
        with BuildLine():
            Line((2.05734639, 0), (-0.11309431, 2.054235587))
            Line((-0.11309431, 2.054235587), (-0.153079186, 2.053135752))
            ThreePointArc((-0.153079186, 2.053135752), (-0.068258454, 1.026795659), (-0.039984877, -0.001099835))
            Line((-0.039984877, -0.001099835), (0.001099835, -0.039984877))
            ThreePointArc((0.001099835, -0.039984877), (1.028995329, -0.011711299), (2.058446225, -0.039984877))
            Line((2.058446225, -0.039984877), (2.05734639, 0))
        make_face()
    chamfer5_piece_9b = extrude(amount=23.74964397, mode=Mode.PRIVATE)
    chamfer5_piece_9b = split(chamfer5_piece_9b, bisect_by=Plane(origin=(-13.855319863, 0, 15.64111267), z_dir=(0, 1, 0)), keep=Keep.TOP, mode=Mode.PRIVATE)
    chamfer5_piece_9 = chamfer5_piece_9a & chamfer5_piece_9b
    add(chamfer5_piece_9, mode=Mode.SUBTRACT)

    # Chamfer6
    chamfer6_edges = [part.edges().sort_by_distance(p)[0] for p in [
        (14.5, 0, 0),
        (-14.5, 0, 0),
    ]]
    chamfer(chamfer6_edges, length=CHAMFER6_SIZE)

    # Sketch25 → Cut-Extrude12 (cut, through all)
    with BuildSketch(Plane(origin=(0, 15.5, 0), x_dir=(1, 0, 0), z_dir=(0, 1, 0))):
        with Locations((1.645190759, -61.941108047)):
            Rectangle(SKETCH25_W, SKETCH25_H)
    extrude(amount=-CUT_EXTRUDE12_DEPTH, mode=Mode.SUBTRACT)

    # Chamfer7
    chamfer7_edges = [part.edges().sort_by_distance(p)[0] for p in [
        (-14.5, 5.75, 40),
        (14.5, 5.75, 40),
    ]]
    chamfer(chamfer7_edges, length=CHAMFER7_SIZE)

    # Chamfer8
    # the kernel refuses this chamfer: 10 mm, written as the material it takes off along each edge
    with BuildSketch(Plane(origin=(30.684544799, 0, 13.815455201), x_dir=(0.019442520806013993, 0.9996219169112968, 0.019442520806014284), z_dir=(-0.7071067811865476, 0, 0.7071067811865476))) as chamfer8_piece_1:
        Polygon((CHAMFER8_SIZE * 0.999621916911, CHAMFER8_SIZE * 0.0274958766106), (-CHAMFER8_SIZE * 0.0274958766106, CHAMFER8_SIZE * 0.999621916911), (0, 0), align=None)
    extrude(amount=55.676300446, mode=Mode.SUBTRACT)
    with BuildSketch(Plane(origin=(-30.684544799, 0, 13.815455201), x_dir=(-0.019442520806014146, 0.9996219169112968, 0.019442520806014135), z_dir=(0.7071067811865476, 0, 0.7071067811865476))) as chamfer8_piece_2:
        Polygon((CHAMFER8_SIZE * 0.999621916911, -CHAMFER8_SIZE * 0.0274958766106), (-CHAMFER8_SIZE * 0.0274958766106, -CHAMFER8_SIZE * 0.999621916911), (0, 0), align=None)
    extrude(amount=55.676300446, mode=Mode.SUBTRACT)

    # Chamfer9
    chamfer9_edges = [part.edges().sort_by_distance(p)[0] for p in [
        (6.5, 15.5, 38),
        (-6.5, 15.5, 38),
    ]]
    chamfer(chamfer9_edges, length=CHAMFER9_SIZE)


solid = part.part
